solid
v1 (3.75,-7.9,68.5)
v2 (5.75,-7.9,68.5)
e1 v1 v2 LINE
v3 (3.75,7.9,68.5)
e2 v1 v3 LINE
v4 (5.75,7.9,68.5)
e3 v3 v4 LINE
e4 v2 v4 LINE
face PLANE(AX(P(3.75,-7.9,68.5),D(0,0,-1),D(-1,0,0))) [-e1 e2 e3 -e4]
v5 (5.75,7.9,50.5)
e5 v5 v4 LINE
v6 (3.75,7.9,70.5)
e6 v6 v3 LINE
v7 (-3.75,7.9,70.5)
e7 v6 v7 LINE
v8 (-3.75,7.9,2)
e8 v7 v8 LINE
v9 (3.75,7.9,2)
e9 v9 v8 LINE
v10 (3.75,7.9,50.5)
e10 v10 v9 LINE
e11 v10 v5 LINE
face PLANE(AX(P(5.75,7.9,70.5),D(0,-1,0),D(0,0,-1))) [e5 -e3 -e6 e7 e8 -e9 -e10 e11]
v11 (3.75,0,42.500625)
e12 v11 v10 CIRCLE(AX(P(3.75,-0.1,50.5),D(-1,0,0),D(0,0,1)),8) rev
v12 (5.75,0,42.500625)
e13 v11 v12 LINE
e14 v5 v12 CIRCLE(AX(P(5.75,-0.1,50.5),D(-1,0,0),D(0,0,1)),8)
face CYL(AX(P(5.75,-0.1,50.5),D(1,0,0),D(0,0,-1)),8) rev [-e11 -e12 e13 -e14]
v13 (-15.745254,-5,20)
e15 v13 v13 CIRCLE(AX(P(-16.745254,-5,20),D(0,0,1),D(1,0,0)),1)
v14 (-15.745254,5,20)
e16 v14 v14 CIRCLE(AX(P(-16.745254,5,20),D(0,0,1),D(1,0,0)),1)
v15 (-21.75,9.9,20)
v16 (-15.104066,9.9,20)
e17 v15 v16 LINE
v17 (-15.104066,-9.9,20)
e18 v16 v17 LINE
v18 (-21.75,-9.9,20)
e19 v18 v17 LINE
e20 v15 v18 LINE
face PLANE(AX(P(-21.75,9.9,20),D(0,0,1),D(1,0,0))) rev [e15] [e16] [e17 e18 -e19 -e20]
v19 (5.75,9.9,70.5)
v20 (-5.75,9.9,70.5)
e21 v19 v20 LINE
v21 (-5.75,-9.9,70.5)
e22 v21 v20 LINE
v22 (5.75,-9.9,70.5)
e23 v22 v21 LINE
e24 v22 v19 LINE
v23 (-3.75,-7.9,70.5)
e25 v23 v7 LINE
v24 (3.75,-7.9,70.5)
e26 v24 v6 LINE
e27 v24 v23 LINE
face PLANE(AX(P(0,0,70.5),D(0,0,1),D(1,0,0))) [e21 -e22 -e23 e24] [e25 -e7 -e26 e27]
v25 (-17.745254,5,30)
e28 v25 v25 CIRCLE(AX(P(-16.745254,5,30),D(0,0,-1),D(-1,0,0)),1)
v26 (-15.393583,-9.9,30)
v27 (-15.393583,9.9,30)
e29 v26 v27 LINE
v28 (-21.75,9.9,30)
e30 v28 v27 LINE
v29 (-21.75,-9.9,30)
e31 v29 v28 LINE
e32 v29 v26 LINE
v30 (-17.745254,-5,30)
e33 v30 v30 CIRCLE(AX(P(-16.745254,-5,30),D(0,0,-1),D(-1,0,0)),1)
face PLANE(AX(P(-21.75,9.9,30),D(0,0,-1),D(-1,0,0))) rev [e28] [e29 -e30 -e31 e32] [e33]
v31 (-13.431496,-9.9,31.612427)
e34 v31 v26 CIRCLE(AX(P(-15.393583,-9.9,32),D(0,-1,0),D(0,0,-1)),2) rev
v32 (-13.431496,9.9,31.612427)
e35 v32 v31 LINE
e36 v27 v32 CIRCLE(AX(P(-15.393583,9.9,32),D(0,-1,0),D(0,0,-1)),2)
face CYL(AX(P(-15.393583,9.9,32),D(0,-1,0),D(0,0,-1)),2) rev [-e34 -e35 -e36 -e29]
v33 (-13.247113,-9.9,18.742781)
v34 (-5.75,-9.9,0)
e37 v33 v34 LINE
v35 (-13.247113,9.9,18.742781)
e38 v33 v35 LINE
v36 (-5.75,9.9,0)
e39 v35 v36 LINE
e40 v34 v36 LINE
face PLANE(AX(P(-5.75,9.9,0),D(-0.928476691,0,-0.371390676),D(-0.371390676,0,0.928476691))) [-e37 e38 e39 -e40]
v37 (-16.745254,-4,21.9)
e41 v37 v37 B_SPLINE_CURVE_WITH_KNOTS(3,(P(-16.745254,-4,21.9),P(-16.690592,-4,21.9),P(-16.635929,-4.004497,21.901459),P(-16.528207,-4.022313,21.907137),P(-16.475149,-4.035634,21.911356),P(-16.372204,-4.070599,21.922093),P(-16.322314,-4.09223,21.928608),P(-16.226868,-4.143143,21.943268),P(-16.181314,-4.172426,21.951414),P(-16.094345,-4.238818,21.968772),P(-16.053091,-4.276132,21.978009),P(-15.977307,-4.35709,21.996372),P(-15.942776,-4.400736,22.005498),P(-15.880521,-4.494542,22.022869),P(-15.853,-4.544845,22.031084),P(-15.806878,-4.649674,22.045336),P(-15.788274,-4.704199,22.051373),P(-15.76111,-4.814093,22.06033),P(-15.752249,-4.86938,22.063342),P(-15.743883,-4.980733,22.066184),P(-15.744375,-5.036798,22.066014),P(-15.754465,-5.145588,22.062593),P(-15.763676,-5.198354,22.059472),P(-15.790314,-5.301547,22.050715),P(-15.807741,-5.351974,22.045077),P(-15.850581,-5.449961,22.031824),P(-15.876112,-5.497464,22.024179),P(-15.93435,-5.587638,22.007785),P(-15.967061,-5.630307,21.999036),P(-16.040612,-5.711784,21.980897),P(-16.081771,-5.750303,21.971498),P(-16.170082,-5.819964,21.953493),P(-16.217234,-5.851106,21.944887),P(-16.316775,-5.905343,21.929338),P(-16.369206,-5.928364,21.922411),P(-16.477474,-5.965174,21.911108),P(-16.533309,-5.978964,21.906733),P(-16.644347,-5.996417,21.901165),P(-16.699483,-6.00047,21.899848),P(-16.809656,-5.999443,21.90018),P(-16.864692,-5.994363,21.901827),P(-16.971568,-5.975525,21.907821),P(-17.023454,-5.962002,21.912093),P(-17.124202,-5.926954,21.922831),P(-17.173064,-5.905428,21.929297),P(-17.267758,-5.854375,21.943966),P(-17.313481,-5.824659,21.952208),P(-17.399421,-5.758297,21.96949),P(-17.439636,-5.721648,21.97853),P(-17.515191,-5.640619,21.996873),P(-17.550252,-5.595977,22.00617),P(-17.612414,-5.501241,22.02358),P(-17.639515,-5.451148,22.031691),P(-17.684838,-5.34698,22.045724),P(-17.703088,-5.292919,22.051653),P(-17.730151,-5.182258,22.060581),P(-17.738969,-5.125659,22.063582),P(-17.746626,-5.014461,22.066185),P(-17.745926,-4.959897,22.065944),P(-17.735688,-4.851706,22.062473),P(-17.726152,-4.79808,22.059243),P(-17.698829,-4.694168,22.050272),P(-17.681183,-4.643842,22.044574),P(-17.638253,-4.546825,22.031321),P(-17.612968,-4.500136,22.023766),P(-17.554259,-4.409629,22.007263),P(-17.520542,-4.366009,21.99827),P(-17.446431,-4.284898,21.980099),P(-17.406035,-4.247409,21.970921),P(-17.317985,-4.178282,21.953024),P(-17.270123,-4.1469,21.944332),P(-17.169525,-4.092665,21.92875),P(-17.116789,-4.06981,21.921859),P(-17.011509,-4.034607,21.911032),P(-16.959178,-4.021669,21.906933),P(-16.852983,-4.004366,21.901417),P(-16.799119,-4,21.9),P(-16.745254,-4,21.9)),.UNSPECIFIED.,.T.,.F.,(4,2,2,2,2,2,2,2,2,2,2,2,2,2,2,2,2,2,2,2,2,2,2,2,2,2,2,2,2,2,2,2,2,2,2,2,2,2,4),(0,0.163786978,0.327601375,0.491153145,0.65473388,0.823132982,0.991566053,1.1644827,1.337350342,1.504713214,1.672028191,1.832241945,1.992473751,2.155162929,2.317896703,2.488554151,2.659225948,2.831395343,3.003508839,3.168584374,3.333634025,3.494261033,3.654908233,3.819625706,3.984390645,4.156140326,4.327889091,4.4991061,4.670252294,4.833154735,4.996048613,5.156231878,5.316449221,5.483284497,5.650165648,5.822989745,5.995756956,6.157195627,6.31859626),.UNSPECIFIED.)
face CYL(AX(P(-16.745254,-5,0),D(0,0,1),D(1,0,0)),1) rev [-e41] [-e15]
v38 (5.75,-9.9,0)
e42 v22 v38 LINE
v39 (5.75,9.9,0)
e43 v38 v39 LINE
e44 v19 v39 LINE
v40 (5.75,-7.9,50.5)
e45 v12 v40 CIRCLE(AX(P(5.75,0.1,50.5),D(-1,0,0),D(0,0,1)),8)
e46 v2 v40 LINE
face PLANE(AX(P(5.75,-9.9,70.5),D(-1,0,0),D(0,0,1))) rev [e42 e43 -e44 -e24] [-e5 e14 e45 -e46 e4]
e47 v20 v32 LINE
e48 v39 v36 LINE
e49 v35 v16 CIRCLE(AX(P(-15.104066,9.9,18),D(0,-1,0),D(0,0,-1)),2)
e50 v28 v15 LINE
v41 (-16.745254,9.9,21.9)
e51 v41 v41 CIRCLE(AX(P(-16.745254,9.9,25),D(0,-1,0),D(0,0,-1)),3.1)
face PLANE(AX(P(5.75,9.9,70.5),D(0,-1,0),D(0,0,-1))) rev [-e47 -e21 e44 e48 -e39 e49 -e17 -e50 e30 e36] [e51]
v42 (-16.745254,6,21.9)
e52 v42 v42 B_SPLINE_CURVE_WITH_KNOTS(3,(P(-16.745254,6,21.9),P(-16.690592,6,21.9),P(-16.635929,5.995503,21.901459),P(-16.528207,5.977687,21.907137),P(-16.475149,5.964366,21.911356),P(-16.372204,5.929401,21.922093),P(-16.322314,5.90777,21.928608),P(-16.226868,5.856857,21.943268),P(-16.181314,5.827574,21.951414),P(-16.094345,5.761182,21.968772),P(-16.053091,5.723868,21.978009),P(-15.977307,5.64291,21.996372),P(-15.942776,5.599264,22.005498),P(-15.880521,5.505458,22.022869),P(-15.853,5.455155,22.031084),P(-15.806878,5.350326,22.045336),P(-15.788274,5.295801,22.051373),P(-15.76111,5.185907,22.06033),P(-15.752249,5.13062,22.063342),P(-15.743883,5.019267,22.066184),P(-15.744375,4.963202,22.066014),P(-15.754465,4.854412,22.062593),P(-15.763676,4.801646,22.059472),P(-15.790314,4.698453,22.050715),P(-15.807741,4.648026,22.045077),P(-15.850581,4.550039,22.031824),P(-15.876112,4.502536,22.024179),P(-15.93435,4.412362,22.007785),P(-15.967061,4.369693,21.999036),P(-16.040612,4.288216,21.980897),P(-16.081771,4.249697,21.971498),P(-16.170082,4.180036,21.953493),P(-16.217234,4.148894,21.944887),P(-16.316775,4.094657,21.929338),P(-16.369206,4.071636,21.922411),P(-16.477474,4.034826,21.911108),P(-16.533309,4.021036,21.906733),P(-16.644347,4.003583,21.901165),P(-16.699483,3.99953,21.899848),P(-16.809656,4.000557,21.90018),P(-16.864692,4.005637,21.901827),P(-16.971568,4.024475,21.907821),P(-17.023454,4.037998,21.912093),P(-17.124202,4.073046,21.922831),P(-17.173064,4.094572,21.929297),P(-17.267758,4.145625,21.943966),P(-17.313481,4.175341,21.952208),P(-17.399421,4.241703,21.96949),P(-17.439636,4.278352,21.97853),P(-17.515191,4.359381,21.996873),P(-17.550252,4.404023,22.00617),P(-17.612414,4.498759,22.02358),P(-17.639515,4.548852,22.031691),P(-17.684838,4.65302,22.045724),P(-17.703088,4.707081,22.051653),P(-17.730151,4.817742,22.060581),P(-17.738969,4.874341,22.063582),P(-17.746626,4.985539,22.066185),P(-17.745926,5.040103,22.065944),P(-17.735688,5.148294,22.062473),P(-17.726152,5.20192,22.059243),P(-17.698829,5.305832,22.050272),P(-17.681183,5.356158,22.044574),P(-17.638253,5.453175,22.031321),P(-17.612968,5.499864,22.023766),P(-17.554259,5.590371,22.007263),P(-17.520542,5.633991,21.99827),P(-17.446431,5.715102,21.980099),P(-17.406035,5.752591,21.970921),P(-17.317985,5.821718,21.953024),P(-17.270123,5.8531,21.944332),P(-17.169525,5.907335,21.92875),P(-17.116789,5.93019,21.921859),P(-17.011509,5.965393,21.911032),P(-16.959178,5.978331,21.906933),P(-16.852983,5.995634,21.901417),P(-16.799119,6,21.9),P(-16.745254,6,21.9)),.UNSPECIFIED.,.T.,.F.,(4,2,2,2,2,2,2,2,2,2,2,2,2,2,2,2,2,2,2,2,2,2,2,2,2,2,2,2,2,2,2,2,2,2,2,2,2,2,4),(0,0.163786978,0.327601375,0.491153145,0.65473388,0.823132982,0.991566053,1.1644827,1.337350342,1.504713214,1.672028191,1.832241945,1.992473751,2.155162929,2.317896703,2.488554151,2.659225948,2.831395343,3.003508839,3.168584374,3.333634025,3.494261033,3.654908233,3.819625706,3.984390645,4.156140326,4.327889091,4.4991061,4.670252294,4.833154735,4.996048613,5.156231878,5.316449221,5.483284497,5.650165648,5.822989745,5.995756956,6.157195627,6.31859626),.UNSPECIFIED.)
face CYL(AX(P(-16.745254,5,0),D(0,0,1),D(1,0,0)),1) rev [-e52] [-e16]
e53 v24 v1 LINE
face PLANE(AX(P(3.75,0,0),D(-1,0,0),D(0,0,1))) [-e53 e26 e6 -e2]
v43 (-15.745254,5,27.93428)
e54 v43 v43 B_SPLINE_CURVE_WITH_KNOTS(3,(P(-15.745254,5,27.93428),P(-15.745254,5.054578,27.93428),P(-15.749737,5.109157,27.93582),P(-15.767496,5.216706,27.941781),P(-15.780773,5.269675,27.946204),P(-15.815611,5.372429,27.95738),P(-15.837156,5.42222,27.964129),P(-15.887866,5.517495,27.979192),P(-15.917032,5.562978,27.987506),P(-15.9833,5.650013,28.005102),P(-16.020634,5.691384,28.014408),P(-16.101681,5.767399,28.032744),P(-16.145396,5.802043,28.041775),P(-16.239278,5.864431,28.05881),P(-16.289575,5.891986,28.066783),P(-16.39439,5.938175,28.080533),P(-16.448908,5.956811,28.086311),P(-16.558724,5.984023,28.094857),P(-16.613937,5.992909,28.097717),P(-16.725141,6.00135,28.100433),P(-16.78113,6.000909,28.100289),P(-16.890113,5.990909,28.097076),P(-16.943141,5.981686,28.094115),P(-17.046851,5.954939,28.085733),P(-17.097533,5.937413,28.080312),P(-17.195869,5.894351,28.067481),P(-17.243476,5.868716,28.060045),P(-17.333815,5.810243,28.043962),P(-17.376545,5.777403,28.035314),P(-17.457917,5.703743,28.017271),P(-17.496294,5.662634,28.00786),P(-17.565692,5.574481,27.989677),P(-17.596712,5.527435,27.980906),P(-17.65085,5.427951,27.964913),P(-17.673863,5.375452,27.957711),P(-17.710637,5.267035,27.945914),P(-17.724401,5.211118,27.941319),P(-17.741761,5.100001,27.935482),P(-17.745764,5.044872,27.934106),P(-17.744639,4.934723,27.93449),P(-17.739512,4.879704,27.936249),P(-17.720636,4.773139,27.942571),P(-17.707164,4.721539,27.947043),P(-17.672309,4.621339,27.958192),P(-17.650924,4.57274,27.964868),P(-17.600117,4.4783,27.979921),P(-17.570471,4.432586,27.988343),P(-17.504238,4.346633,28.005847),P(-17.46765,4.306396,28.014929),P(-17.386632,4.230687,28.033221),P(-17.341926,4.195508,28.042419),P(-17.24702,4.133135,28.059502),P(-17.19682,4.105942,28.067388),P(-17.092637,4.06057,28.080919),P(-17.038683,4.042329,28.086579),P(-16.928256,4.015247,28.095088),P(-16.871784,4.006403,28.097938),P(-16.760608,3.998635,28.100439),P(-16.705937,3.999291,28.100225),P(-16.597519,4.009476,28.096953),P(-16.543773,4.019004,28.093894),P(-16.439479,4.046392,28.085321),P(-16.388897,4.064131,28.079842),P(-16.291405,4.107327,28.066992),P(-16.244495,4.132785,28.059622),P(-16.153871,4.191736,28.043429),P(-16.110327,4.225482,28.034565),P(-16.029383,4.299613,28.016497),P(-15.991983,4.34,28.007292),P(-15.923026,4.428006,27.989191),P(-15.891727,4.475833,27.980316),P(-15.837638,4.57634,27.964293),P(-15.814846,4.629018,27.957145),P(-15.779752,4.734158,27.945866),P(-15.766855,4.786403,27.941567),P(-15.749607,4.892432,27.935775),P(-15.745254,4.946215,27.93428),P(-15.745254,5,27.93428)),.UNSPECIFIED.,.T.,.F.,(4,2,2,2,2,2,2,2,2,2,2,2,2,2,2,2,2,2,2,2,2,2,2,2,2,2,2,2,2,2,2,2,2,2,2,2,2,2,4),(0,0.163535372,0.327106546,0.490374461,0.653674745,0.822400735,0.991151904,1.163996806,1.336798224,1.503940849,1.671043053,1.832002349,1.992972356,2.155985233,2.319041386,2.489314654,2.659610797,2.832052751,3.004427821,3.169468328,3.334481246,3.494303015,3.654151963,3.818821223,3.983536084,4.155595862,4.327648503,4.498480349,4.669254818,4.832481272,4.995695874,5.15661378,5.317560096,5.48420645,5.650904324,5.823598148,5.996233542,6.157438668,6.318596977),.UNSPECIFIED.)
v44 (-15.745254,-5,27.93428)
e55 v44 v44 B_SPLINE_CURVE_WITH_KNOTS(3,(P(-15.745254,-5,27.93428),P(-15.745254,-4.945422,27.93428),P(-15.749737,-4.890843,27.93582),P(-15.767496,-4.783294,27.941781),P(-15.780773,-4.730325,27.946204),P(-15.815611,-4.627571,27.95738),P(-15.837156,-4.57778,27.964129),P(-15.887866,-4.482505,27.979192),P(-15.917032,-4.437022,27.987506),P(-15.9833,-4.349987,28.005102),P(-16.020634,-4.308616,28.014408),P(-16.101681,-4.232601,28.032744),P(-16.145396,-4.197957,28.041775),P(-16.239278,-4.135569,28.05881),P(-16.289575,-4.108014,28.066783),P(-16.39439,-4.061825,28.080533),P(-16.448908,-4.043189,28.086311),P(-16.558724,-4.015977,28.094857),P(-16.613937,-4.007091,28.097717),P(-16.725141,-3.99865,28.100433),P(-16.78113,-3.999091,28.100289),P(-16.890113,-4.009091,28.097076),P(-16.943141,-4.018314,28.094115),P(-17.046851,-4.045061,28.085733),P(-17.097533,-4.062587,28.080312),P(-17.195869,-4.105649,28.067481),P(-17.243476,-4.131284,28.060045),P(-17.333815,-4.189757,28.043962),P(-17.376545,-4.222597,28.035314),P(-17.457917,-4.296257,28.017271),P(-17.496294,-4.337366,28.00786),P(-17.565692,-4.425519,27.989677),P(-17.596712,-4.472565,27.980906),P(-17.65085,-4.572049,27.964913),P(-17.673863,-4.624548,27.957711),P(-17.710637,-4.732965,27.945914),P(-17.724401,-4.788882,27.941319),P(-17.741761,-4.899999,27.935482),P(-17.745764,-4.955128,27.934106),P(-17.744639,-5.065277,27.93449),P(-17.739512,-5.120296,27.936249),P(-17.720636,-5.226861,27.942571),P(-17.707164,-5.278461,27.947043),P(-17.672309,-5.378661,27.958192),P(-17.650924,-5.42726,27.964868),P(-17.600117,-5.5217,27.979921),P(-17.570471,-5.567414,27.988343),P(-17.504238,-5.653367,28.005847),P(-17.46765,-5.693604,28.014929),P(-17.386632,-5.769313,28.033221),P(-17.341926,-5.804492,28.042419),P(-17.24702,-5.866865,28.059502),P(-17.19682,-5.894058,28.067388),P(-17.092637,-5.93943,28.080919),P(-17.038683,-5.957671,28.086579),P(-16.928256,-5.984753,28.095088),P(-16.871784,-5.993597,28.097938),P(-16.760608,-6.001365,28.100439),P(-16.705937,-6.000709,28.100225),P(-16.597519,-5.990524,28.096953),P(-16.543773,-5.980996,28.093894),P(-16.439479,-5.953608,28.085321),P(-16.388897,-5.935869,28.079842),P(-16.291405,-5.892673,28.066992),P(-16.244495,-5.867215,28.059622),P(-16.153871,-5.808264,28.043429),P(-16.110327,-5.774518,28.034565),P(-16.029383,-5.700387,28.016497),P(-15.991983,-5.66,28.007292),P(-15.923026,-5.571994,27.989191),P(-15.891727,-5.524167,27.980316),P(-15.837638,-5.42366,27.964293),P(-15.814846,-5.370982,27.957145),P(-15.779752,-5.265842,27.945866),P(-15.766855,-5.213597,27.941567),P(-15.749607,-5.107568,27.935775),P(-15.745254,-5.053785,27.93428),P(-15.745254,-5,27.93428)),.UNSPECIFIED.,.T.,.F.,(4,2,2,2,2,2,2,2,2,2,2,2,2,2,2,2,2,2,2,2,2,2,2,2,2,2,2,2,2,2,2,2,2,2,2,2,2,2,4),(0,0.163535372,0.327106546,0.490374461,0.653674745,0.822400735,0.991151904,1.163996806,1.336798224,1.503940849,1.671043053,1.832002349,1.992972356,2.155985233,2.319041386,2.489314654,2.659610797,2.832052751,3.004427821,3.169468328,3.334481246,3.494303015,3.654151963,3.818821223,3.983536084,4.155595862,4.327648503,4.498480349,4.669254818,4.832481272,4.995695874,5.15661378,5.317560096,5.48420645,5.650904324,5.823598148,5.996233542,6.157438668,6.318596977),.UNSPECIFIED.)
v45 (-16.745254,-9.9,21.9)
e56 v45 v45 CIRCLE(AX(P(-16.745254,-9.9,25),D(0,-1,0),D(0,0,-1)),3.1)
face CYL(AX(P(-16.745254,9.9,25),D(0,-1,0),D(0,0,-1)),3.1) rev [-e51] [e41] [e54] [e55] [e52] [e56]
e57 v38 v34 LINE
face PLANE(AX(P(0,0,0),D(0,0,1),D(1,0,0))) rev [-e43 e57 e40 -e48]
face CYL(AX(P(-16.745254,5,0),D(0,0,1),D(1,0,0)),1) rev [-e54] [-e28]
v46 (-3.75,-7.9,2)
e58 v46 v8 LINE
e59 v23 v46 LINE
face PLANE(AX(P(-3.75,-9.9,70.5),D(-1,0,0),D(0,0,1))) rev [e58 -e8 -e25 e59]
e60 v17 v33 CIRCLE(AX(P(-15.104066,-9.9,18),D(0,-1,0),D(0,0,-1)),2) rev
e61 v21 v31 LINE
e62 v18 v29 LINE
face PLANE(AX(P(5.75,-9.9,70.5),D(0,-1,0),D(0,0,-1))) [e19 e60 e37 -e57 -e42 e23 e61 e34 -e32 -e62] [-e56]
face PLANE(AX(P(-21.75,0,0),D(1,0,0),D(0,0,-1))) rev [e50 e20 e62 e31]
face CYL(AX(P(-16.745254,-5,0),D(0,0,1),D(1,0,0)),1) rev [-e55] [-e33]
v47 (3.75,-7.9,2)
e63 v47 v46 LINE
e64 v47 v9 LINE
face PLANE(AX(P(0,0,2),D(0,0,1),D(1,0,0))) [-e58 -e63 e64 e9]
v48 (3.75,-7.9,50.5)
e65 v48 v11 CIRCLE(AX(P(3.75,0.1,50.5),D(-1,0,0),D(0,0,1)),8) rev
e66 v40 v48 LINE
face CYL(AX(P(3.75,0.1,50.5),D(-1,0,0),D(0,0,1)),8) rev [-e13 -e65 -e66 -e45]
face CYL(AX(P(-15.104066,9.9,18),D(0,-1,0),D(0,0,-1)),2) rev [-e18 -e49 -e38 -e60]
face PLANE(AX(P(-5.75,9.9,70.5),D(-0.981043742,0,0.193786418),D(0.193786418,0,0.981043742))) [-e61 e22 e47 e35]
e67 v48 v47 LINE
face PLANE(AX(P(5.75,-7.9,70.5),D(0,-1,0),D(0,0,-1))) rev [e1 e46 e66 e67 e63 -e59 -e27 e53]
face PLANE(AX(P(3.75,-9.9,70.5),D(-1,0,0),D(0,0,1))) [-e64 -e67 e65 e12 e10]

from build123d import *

# Parameters (mm, degrees)
CROQUIS1_W                 = 19.8
CROQUIS1_H                 = 11.5
SALIENTE_EXTRUIR1_DEPTH    = 70.5
VACIADO1_T                 = -2
CROQUIS4_W                 = 15.8
CROQUIS4_H                 = 28
CORTAR_EXTRUIR1_DEPTH      = 2
REDONDEO1_R                = 8
CROQUIS5_W                 = 15.8
CROQUIS5_H                 = 2
SALIENTE_EXTRUIR2_DEPTH    = 2
CROQUIS6_W                 = 19.8
CROQUIS6_H                 = 10
SALIENTE_EXTRUIR4_DEPTH    = 16
SALIENTE_EXTRUIR5_DEPTH    = 19.8
CROQUIS10_R                = 3.1
CORTAR_EXTRUIR4_DEPTH      = 19.8
REDONDEO3_R                = 2
CORTAR_EXTRUIR5_DEPTH      = 52.393798264
CORTAR_EXTRUIR5_DEPTH_BACK = 52.393798264
CROQUIS11_R                = 1


with BuildPart() as part:
    # Croquis1 → Saliente-Extruir1 (new body)
    with BuildSketch(Plane(origin=(0, 0, 0), x_dir=(0, 1, 0), z_dir=(0, 0, 1))):
        Rectangle(CROQUIS1_W, CROQUIS1_H)
    extrude(amount=SALIENTE_EXTRUIR1_DEPTH)

    # Vaciado1
    vaciado1_openings = [part.faces().sort_by_distance(p)[0] for p in [
        (0, 0, 70.5),
    ]]
    offset(amount=VACIADO1_T, openings=vaciado1_openings, kind=Kind.INTERSECTION)

    # Croquis4 → Cortar-Extruir1 (cut)
    with BuildSketch(Plane.YZ.offset(5.75)):
        with Locations((0, 56.5)):
            Rectangle(CROQUIS4_W, CROQUIS4_H)
    extrude(amount=-CORTAR_EXTRUIR1_DEPTH, mode=Mode.SUBTRACT)

    # Redondeo1
    # the kernel refuses this fillet: 8 mm, written as the material it adds along each edge
    with BuildSketch(Plane(origin=(5.75, 7.9, 42.5), x_dir=(0, -1, 0), z_dir=(-1, 0, 0)), Plane(origin=(5.75, -7.9, 42.5), x_dir=(0, 0, 1), z_dir=(-1, 0, 0))) as redondeo1_piece_1:
        with BuildLine():
            CenterArc((REDONDEO1_R, REDONDEO1_R), REDONDEO1_R, 180, 90)
            Line((0, REDONDEO1_R), (0, 0))
            Line((0, 0), (REDONDEO1_R, 0))
        make_face()
    extrude(amount=2)

    # Croquis5 → Saliente-Extruir2 (add)
    with BuildSketch(Plane.YZ.offset(5.75)):
        with Locations((0, 69.5)):
            Rectangle(CROQUIS5_W, CROQUIS5_H)
    extrude(amount=-SALIENTE_EXTRUIR2_DEPTH)

    # Croquis6 → Saliente-Extruir4 (add)
    with BuildSketch(Plane(origin=(-5.75, 0, 0), x_dir=(0, -1, 0), z_dir=(-1, 0, 0))):
        with Locations((0, 25)):
            Rectangle(CROQUIS6_W, CROQUIS6_H)
    extrude(amount=SALIENTE_EXTRUIR4_DEPTH)

    # Croquis9 → Saliente-Extruir5 (add)
    with BuildSketch(Plane.XZ.offset(9.9)):
        Polygon((-5.75, 70.5), (-13.75, 30), (-5.75, 30), align=None)
        Polygon((-5.75, 0), (-13.75, 20), (-5.75, 20), align=None)
    extrude(amount=-SALIENTE_EXTRUIR5_DEPTH)

    # Croquis10 → Cortar-Extruir4 (cut)
    with BuildSketch(Plane.XZ.offset(9.9)):
        with Locations(Location((-16.745253682, 25, 0), (0, 0, 270))):
            Circle(CROQUIS10_R)
    extrude(amount=-CORTAR_EXTRUIR4_DEPTH, mode=Mode.SUBTRACT)

    # Redondeo3
    redondeo3_edges = [part.edges().sort_by_distance(p)[0] for p in [
        (-13.75, 0, 20),
        (-13.75, 0, 30),
    ]]
    fillet(redondeo3_edges, radius=REDONDEO3_R)

    # Croquis11 → Cortar-Extruir5 (cut, two sides: drawn at the far end of the back side and taken through both)
    with BuildSketch(Plane(origin=(0, 0, 25), x_dir=(0, -1, 0), z_dir=(0, 0, 1)).offset(-CORTAR_EXTRUIR5_DEPTH_BACK)):
        with Locations(Location((-5, -16.745253682, 0), (0, 0, 90))):
            Circle(CROQUIS11_R)
        with Locations(Location((5, -16.745253682, 0), (0, 0, 90))):
            Circle(CROQUIS11_R)
    extrude(amount=CORTAR_EXTRUIR5_DEPTH + CORTAR_EXTRUIR5_DEPTH_BACK, mode=Mode.SUBTRACT)


solid = part.part
